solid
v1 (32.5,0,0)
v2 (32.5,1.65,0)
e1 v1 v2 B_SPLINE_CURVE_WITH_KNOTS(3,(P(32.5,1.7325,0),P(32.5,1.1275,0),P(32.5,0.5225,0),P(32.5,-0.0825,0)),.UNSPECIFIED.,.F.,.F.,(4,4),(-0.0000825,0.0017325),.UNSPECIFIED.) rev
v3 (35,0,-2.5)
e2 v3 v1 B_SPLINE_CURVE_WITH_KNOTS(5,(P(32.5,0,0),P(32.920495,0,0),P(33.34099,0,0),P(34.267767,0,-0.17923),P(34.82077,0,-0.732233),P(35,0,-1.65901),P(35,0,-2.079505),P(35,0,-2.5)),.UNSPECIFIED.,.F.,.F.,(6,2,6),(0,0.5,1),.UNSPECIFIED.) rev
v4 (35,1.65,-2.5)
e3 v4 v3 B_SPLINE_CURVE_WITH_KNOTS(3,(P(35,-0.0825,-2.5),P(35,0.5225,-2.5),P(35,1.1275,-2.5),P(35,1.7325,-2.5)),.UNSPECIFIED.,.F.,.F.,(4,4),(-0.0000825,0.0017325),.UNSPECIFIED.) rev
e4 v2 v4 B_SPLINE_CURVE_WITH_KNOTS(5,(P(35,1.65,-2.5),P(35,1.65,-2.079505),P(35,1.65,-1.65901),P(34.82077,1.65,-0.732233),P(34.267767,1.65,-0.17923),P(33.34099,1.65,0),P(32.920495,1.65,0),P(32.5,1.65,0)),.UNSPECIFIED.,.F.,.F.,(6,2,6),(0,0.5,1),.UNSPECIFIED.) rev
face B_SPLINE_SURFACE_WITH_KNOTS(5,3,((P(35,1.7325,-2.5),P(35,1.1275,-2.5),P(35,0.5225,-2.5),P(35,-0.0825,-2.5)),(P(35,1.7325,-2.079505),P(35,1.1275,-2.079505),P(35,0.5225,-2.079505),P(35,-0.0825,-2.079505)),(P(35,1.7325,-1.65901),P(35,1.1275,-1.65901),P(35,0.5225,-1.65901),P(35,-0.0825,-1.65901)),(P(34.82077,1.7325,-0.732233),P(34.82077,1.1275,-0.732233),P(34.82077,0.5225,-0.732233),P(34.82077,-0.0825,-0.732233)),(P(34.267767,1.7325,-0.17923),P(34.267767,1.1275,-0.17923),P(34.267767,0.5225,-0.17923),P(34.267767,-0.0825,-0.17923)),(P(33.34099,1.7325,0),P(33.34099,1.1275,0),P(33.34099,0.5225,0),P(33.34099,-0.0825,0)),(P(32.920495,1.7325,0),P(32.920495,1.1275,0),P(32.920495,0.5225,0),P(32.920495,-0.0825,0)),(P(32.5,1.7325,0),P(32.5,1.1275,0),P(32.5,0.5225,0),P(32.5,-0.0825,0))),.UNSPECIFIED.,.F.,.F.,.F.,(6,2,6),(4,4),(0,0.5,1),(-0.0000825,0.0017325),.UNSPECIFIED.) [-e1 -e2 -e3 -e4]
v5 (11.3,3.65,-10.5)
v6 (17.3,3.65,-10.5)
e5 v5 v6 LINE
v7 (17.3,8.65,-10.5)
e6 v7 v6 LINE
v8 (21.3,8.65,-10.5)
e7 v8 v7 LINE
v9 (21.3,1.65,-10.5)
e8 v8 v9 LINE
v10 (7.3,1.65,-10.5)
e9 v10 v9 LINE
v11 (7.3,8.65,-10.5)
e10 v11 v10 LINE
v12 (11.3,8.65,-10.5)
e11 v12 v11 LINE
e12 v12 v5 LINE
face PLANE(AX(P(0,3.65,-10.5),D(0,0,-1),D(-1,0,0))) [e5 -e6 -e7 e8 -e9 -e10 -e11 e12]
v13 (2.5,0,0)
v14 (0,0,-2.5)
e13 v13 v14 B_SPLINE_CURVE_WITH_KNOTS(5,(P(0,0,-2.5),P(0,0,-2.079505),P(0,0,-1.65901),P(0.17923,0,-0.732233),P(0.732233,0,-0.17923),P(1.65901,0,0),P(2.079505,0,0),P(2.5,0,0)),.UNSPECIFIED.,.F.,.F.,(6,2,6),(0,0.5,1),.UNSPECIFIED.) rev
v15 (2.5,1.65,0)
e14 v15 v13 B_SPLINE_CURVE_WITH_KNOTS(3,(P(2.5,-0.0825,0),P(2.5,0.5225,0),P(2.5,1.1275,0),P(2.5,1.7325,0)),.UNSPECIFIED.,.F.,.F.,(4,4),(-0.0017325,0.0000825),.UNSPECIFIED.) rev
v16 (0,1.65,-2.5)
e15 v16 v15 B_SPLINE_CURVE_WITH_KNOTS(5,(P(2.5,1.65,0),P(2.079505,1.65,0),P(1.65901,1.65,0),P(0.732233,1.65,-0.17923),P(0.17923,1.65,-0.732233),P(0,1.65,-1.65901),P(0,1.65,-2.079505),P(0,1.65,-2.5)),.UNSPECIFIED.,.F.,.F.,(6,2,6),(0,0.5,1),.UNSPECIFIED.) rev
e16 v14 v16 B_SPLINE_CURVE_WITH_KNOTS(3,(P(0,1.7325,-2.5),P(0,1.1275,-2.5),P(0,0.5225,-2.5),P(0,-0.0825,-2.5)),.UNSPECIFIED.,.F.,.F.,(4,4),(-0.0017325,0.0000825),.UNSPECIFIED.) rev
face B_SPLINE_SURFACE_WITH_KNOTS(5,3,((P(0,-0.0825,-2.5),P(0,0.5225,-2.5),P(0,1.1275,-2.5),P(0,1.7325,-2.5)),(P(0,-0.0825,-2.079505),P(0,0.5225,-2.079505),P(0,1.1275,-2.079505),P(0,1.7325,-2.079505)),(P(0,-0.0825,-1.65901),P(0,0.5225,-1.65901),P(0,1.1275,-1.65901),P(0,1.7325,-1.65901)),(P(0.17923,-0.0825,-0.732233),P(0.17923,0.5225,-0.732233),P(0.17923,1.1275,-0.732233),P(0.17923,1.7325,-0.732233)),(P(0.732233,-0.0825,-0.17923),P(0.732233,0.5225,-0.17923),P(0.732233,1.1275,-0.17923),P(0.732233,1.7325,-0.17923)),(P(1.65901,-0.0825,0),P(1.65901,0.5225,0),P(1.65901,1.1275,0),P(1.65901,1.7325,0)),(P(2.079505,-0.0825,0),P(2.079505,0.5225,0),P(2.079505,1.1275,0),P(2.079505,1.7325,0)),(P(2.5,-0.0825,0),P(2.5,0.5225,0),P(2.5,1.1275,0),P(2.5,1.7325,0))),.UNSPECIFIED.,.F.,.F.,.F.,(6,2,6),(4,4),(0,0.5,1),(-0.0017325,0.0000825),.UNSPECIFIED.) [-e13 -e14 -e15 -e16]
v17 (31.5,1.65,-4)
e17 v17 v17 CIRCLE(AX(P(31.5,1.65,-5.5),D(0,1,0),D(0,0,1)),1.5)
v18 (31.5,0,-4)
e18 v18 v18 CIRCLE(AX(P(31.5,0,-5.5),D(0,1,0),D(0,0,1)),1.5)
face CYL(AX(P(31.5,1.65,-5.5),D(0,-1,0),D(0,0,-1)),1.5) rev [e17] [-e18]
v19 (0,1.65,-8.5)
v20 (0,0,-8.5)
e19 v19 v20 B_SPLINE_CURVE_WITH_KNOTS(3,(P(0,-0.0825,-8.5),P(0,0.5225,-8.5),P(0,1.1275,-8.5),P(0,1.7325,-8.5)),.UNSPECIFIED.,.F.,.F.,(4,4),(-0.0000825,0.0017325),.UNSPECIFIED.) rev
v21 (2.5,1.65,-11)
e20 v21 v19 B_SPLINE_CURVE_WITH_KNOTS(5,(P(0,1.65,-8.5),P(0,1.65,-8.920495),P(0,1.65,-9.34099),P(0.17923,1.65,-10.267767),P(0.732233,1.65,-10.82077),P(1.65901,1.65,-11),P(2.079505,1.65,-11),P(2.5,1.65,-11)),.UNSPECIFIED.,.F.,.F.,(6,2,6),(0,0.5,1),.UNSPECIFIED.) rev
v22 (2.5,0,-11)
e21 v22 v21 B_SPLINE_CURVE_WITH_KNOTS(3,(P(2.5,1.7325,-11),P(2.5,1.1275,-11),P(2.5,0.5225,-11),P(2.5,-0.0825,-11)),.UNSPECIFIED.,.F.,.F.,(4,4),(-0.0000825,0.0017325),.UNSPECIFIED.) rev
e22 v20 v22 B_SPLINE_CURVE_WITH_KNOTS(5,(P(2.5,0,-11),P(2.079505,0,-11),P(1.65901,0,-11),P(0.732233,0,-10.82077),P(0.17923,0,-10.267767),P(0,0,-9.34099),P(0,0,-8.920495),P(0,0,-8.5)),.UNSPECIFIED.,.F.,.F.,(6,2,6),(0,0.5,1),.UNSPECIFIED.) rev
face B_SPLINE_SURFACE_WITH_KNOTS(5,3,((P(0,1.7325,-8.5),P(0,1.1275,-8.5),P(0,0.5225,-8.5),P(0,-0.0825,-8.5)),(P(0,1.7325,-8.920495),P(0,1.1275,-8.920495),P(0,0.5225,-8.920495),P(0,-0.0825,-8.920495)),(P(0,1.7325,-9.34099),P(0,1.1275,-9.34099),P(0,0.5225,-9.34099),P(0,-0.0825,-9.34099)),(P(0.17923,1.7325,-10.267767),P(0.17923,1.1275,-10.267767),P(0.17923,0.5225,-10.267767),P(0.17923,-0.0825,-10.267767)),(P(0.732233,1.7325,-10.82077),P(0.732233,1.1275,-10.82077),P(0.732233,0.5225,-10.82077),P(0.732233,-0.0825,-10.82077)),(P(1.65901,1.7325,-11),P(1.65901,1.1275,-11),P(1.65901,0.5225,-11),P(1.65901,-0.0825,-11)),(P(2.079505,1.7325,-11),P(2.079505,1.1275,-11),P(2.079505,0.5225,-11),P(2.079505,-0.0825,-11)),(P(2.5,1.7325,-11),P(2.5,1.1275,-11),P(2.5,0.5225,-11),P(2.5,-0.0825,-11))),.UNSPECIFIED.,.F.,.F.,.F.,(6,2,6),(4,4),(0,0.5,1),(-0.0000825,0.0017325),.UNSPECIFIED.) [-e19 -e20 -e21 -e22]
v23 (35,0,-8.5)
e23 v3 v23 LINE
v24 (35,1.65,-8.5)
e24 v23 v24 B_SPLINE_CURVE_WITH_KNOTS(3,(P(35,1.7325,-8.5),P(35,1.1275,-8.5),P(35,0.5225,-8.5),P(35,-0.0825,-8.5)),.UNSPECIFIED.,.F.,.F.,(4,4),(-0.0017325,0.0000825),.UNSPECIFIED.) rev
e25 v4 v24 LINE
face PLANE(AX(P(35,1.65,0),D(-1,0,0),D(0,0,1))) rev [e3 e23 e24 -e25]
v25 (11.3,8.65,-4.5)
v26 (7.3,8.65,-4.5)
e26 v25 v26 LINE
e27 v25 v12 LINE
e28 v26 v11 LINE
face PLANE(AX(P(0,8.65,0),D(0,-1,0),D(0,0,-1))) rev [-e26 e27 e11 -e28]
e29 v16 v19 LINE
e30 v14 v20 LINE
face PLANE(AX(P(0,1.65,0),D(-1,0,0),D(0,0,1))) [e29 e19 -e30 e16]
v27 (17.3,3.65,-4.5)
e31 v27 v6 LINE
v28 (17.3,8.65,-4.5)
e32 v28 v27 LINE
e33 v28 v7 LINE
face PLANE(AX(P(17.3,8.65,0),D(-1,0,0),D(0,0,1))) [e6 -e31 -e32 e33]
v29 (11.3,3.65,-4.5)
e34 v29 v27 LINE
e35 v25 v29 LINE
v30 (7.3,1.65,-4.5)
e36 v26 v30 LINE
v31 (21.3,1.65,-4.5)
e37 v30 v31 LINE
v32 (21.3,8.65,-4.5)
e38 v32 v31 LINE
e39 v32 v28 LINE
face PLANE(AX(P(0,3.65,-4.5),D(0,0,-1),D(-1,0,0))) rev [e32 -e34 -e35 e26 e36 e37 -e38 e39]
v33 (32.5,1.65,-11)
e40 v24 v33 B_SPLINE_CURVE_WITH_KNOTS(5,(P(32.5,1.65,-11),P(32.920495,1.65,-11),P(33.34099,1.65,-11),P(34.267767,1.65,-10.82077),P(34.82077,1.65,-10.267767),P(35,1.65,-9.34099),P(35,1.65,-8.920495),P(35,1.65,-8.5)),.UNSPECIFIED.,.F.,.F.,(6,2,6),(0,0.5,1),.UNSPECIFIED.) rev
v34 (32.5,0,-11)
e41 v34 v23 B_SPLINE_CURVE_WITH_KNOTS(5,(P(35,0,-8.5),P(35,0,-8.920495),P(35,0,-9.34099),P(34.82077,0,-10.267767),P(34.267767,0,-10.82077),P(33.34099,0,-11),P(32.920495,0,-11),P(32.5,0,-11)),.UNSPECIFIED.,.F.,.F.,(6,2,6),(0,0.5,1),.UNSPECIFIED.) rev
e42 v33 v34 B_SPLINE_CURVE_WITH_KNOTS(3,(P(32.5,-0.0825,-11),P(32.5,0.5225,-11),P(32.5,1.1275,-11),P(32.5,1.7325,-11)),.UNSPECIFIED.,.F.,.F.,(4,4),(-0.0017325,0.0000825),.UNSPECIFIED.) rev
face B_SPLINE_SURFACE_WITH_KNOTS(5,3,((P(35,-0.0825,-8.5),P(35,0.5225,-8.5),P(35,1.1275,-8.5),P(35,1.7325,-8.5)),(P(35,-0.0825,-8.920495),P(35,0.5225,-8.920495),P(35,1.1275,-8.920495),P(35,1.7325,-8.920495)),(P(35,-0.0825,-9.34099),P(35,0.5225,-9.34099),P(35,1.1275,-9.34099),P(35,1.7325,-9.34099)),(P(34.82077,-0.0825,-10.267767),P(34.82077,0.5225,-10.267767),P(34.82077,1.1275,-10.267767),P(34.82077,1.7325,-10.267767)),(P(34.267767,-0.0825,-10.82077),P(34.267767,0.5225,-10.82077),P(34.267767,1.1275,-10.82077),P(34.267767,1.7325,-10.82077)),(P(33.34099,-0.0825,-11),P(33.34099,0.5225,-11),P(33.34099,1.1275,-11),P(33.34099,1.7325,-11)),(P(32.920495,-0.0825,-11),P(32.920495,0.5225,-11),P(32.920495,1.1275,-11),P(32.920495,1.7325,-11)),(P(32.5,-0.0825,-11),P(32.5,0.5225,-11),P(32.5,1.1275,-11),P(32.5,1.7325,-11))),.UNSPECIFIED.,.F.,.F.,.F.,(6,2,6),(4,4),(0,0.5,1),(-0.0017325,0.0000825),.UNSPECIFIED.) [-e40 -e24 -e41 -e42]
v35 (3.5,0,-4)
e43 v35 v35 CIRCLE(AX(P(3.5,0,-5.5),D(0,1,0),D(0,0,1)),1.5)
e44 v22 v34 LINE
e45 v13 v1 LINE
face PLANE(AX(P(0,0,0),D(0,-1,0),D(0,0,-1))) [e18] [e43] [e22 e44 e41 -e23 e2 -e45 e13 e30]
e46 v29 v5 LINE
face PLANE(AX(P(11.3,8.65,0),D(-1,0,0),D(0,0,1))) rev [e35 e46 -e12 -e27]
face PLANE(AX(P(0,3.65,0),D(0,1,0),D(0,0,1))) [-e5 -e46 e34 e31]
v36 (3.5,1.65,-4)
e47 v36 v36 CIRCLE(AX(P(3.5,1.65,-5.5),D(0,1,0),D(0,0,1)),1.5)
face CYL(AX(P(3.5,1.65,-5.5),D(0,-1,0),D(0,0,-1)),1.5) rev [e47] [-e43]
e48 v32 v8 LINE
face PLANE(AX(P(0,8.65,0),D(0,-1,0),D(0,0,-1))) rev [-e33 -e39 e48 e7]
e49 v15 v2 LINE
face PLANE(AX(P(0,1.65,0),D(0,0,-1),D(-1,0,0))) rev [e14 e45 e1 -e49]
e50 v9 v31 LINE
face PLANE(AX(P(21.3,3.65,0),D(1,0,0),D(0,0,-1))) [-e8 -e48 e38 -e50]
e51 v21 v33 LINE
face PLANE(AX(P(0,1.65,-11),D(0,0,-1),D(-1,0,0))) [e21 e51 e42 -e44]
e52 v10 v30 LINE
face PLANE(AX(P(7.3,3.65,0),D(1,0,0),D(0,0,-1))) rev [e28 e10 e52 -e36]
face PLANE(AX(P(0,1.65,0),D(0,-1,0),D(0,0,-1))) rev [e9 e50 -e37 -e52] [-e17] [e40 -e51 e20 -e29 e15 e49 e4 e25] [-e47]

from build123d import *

# Parameters (mm, degrees)
SKETCH1_W           = 35
SKETCH1_H           = 11
SKETCH1_R           = 1.5
BOSS_EXTRUDE1_DEPTH = 1.65
FILLET1_SIZE        = 2.5
BOSS_EXTRUDE2_START = 1.65
SKETCH1_3_W         = 14
SKETCH1_3_H         = 6
BOSS_EXTRUDE2_DEPTH = 2
BOSS_EXTRUDE3_START = 3.65
SKETCH1_4_W         = 4
SKETCH1_4_H         = 5
SKETCH1_4_H_2       = 1
BOSS_EXTRUDE3_DEPTH = 5


with BuildPart() as part:
    # Sketch1 → Boss-Extrude1 (new body)
    with BuildSketch(Plane(origin=(0, 0, 0), x_dir=(1, 0, 0), z_dir=(0, 1, 0))):
        with Locations((17.5, 5.5)):
            Rectangle(SKETCH1_W, SKETCH1_H)
        with Locations(Location((3.5, 5.5, 0), (0, 0, 270))):
            Circle(SKETCH1_R, mode=Mode.SUBTRACT)
        with Locations(Location((31.5, 5.5, 0), (0, 0, 270))):
            Circle(SKETCH1_R, mode=Mode.SUBTRACT)
    extrude(amount=BOSS_EXTRUDE1_DEPTH)

    # Fillet1
    # a fillet whose section is not a circle: 2.5 mm, written as the material it takes off along each edge
    with BuildSketch(Plane(origin=(0, -6.25, -11), x_dir=(1, 0, 0), z_dir=(0, 1, 0)), Plane(origin=(35, -6.25, -11), x_dir=(0, 0, 1), z_dir=(0, 1, 0)), Plane(origin=(35, -6.25, 0), x_dir=(-1, 0, 0), z_dir=(0, 1, 0))) as fillet1_piece_1:
        with BuildLine():
            add(Edge.make_bspline([(FILLET1_SIZE, 0), (FILLET1_SIZE * 0.831801948466, 0), (FILLET1_SIZE * 0.663603896932, 0), (FILLET1_SIZE * 0.292893218813, -FILLET1_SIZE * 0.0716919198361), (FILLET1_SIZE * 0.0716919198361, -FILLET1_SIZE * 0.292893218813), (0, -FILLET1_SIZE * 0.663603896932), (0, -FILLET1_SIZE * 0.831801948466), (0, -FILLET1_SIZE)], knots=[0, 0, 0, 0, 0, 0, 0.5, 0.5, 1, 1, 1, 1, 1, 1], degree=5))
            Line((0, -FILLET1_SIZE), (0, 0))
            Line((0, 0), (FILLET1_SIZE, 0))
        make_face()
    extrude(amount=14.15, mode=Mode.SUBTRACT)
    with BuildSketch(Plane(origin=(0, -6.25, 0), x_dir=(1, 0, 0), z_dir=(0, 1, 0))) as fillet1_piece_2:
        with BuildLine():
            add(Edge.make_bspline([(FILLET1_SIZE, 0), (FILLET1_SIZE * 0.831801948466, 0), (FILLET1_SIZE * 0.663603896932, 0), (FILLET1_SIZE * 0.292893218813, FILLET1_SIZE * 0.0716919198361), (FILLET1_SIZE * 0.0716919198361, FILLET1_SIZE * 0.292893218813), (0, FILLET1_SIZE * 0.663603896932), (0, FILLET1_SIZE * 0.831801948466), (0, FILLET1_SIZE)], knots=[0, 0, 0, 0, 0, 0, 0.5, 0.5, 1, 1, 1, 1, 1, 1], degree=5))
            Line((0, FILLET1_SIZE), (0, 0))
            Line((0, 0), (FILLET1_SIZE, 0))
        make_face()
    extrude(amount=14.15, mode=Mode.SUBTRACT)

    # Sketch1<3> → Boss-Extrude2 (add)
    with BuildSketch(Plane(origin=(0, 0, 0), x_dir=(1, 0, 0), z_dir=(0, 1, 0)).offset(BOSS_EXTRUDE2_START)):
        with Locations((14.3, 7.5)):
            Rectangle(SKETCH1_3_W, SKETCH1_3_H)
    extrude(amount=BOSS_EXTRUDE2_DEPTH)

    # Sketch1<4> → Boss-Extrude3 (add)
    with BuildSketch(Plane(origin=(0, 0, 0), x_dir=(1, 0, 0), z_dir=(0, 1, 0)).offset(BOSS_EXTRUDE3_START)):
        with Locations((9.3, 8)):
            Rectangle(SKETCH1_4_W, SKETCH1_4_H)
        with Locations((19.3, 8)):
            Rectangle(SKETCH1_4_W, SKETCH1_4_H)
        with Locations((9.3, 5)):
            Rectangle(SKETCH1_4_W, SKETCH1_4_H_2)
        with Locations((19.3, 5)):
            Rectangle(SKETCH1_4_W, SKETCH1_4_H_2)
    extrude(amount=BOSS_EXTRUDE3_DEPTH)


solid = part.part
